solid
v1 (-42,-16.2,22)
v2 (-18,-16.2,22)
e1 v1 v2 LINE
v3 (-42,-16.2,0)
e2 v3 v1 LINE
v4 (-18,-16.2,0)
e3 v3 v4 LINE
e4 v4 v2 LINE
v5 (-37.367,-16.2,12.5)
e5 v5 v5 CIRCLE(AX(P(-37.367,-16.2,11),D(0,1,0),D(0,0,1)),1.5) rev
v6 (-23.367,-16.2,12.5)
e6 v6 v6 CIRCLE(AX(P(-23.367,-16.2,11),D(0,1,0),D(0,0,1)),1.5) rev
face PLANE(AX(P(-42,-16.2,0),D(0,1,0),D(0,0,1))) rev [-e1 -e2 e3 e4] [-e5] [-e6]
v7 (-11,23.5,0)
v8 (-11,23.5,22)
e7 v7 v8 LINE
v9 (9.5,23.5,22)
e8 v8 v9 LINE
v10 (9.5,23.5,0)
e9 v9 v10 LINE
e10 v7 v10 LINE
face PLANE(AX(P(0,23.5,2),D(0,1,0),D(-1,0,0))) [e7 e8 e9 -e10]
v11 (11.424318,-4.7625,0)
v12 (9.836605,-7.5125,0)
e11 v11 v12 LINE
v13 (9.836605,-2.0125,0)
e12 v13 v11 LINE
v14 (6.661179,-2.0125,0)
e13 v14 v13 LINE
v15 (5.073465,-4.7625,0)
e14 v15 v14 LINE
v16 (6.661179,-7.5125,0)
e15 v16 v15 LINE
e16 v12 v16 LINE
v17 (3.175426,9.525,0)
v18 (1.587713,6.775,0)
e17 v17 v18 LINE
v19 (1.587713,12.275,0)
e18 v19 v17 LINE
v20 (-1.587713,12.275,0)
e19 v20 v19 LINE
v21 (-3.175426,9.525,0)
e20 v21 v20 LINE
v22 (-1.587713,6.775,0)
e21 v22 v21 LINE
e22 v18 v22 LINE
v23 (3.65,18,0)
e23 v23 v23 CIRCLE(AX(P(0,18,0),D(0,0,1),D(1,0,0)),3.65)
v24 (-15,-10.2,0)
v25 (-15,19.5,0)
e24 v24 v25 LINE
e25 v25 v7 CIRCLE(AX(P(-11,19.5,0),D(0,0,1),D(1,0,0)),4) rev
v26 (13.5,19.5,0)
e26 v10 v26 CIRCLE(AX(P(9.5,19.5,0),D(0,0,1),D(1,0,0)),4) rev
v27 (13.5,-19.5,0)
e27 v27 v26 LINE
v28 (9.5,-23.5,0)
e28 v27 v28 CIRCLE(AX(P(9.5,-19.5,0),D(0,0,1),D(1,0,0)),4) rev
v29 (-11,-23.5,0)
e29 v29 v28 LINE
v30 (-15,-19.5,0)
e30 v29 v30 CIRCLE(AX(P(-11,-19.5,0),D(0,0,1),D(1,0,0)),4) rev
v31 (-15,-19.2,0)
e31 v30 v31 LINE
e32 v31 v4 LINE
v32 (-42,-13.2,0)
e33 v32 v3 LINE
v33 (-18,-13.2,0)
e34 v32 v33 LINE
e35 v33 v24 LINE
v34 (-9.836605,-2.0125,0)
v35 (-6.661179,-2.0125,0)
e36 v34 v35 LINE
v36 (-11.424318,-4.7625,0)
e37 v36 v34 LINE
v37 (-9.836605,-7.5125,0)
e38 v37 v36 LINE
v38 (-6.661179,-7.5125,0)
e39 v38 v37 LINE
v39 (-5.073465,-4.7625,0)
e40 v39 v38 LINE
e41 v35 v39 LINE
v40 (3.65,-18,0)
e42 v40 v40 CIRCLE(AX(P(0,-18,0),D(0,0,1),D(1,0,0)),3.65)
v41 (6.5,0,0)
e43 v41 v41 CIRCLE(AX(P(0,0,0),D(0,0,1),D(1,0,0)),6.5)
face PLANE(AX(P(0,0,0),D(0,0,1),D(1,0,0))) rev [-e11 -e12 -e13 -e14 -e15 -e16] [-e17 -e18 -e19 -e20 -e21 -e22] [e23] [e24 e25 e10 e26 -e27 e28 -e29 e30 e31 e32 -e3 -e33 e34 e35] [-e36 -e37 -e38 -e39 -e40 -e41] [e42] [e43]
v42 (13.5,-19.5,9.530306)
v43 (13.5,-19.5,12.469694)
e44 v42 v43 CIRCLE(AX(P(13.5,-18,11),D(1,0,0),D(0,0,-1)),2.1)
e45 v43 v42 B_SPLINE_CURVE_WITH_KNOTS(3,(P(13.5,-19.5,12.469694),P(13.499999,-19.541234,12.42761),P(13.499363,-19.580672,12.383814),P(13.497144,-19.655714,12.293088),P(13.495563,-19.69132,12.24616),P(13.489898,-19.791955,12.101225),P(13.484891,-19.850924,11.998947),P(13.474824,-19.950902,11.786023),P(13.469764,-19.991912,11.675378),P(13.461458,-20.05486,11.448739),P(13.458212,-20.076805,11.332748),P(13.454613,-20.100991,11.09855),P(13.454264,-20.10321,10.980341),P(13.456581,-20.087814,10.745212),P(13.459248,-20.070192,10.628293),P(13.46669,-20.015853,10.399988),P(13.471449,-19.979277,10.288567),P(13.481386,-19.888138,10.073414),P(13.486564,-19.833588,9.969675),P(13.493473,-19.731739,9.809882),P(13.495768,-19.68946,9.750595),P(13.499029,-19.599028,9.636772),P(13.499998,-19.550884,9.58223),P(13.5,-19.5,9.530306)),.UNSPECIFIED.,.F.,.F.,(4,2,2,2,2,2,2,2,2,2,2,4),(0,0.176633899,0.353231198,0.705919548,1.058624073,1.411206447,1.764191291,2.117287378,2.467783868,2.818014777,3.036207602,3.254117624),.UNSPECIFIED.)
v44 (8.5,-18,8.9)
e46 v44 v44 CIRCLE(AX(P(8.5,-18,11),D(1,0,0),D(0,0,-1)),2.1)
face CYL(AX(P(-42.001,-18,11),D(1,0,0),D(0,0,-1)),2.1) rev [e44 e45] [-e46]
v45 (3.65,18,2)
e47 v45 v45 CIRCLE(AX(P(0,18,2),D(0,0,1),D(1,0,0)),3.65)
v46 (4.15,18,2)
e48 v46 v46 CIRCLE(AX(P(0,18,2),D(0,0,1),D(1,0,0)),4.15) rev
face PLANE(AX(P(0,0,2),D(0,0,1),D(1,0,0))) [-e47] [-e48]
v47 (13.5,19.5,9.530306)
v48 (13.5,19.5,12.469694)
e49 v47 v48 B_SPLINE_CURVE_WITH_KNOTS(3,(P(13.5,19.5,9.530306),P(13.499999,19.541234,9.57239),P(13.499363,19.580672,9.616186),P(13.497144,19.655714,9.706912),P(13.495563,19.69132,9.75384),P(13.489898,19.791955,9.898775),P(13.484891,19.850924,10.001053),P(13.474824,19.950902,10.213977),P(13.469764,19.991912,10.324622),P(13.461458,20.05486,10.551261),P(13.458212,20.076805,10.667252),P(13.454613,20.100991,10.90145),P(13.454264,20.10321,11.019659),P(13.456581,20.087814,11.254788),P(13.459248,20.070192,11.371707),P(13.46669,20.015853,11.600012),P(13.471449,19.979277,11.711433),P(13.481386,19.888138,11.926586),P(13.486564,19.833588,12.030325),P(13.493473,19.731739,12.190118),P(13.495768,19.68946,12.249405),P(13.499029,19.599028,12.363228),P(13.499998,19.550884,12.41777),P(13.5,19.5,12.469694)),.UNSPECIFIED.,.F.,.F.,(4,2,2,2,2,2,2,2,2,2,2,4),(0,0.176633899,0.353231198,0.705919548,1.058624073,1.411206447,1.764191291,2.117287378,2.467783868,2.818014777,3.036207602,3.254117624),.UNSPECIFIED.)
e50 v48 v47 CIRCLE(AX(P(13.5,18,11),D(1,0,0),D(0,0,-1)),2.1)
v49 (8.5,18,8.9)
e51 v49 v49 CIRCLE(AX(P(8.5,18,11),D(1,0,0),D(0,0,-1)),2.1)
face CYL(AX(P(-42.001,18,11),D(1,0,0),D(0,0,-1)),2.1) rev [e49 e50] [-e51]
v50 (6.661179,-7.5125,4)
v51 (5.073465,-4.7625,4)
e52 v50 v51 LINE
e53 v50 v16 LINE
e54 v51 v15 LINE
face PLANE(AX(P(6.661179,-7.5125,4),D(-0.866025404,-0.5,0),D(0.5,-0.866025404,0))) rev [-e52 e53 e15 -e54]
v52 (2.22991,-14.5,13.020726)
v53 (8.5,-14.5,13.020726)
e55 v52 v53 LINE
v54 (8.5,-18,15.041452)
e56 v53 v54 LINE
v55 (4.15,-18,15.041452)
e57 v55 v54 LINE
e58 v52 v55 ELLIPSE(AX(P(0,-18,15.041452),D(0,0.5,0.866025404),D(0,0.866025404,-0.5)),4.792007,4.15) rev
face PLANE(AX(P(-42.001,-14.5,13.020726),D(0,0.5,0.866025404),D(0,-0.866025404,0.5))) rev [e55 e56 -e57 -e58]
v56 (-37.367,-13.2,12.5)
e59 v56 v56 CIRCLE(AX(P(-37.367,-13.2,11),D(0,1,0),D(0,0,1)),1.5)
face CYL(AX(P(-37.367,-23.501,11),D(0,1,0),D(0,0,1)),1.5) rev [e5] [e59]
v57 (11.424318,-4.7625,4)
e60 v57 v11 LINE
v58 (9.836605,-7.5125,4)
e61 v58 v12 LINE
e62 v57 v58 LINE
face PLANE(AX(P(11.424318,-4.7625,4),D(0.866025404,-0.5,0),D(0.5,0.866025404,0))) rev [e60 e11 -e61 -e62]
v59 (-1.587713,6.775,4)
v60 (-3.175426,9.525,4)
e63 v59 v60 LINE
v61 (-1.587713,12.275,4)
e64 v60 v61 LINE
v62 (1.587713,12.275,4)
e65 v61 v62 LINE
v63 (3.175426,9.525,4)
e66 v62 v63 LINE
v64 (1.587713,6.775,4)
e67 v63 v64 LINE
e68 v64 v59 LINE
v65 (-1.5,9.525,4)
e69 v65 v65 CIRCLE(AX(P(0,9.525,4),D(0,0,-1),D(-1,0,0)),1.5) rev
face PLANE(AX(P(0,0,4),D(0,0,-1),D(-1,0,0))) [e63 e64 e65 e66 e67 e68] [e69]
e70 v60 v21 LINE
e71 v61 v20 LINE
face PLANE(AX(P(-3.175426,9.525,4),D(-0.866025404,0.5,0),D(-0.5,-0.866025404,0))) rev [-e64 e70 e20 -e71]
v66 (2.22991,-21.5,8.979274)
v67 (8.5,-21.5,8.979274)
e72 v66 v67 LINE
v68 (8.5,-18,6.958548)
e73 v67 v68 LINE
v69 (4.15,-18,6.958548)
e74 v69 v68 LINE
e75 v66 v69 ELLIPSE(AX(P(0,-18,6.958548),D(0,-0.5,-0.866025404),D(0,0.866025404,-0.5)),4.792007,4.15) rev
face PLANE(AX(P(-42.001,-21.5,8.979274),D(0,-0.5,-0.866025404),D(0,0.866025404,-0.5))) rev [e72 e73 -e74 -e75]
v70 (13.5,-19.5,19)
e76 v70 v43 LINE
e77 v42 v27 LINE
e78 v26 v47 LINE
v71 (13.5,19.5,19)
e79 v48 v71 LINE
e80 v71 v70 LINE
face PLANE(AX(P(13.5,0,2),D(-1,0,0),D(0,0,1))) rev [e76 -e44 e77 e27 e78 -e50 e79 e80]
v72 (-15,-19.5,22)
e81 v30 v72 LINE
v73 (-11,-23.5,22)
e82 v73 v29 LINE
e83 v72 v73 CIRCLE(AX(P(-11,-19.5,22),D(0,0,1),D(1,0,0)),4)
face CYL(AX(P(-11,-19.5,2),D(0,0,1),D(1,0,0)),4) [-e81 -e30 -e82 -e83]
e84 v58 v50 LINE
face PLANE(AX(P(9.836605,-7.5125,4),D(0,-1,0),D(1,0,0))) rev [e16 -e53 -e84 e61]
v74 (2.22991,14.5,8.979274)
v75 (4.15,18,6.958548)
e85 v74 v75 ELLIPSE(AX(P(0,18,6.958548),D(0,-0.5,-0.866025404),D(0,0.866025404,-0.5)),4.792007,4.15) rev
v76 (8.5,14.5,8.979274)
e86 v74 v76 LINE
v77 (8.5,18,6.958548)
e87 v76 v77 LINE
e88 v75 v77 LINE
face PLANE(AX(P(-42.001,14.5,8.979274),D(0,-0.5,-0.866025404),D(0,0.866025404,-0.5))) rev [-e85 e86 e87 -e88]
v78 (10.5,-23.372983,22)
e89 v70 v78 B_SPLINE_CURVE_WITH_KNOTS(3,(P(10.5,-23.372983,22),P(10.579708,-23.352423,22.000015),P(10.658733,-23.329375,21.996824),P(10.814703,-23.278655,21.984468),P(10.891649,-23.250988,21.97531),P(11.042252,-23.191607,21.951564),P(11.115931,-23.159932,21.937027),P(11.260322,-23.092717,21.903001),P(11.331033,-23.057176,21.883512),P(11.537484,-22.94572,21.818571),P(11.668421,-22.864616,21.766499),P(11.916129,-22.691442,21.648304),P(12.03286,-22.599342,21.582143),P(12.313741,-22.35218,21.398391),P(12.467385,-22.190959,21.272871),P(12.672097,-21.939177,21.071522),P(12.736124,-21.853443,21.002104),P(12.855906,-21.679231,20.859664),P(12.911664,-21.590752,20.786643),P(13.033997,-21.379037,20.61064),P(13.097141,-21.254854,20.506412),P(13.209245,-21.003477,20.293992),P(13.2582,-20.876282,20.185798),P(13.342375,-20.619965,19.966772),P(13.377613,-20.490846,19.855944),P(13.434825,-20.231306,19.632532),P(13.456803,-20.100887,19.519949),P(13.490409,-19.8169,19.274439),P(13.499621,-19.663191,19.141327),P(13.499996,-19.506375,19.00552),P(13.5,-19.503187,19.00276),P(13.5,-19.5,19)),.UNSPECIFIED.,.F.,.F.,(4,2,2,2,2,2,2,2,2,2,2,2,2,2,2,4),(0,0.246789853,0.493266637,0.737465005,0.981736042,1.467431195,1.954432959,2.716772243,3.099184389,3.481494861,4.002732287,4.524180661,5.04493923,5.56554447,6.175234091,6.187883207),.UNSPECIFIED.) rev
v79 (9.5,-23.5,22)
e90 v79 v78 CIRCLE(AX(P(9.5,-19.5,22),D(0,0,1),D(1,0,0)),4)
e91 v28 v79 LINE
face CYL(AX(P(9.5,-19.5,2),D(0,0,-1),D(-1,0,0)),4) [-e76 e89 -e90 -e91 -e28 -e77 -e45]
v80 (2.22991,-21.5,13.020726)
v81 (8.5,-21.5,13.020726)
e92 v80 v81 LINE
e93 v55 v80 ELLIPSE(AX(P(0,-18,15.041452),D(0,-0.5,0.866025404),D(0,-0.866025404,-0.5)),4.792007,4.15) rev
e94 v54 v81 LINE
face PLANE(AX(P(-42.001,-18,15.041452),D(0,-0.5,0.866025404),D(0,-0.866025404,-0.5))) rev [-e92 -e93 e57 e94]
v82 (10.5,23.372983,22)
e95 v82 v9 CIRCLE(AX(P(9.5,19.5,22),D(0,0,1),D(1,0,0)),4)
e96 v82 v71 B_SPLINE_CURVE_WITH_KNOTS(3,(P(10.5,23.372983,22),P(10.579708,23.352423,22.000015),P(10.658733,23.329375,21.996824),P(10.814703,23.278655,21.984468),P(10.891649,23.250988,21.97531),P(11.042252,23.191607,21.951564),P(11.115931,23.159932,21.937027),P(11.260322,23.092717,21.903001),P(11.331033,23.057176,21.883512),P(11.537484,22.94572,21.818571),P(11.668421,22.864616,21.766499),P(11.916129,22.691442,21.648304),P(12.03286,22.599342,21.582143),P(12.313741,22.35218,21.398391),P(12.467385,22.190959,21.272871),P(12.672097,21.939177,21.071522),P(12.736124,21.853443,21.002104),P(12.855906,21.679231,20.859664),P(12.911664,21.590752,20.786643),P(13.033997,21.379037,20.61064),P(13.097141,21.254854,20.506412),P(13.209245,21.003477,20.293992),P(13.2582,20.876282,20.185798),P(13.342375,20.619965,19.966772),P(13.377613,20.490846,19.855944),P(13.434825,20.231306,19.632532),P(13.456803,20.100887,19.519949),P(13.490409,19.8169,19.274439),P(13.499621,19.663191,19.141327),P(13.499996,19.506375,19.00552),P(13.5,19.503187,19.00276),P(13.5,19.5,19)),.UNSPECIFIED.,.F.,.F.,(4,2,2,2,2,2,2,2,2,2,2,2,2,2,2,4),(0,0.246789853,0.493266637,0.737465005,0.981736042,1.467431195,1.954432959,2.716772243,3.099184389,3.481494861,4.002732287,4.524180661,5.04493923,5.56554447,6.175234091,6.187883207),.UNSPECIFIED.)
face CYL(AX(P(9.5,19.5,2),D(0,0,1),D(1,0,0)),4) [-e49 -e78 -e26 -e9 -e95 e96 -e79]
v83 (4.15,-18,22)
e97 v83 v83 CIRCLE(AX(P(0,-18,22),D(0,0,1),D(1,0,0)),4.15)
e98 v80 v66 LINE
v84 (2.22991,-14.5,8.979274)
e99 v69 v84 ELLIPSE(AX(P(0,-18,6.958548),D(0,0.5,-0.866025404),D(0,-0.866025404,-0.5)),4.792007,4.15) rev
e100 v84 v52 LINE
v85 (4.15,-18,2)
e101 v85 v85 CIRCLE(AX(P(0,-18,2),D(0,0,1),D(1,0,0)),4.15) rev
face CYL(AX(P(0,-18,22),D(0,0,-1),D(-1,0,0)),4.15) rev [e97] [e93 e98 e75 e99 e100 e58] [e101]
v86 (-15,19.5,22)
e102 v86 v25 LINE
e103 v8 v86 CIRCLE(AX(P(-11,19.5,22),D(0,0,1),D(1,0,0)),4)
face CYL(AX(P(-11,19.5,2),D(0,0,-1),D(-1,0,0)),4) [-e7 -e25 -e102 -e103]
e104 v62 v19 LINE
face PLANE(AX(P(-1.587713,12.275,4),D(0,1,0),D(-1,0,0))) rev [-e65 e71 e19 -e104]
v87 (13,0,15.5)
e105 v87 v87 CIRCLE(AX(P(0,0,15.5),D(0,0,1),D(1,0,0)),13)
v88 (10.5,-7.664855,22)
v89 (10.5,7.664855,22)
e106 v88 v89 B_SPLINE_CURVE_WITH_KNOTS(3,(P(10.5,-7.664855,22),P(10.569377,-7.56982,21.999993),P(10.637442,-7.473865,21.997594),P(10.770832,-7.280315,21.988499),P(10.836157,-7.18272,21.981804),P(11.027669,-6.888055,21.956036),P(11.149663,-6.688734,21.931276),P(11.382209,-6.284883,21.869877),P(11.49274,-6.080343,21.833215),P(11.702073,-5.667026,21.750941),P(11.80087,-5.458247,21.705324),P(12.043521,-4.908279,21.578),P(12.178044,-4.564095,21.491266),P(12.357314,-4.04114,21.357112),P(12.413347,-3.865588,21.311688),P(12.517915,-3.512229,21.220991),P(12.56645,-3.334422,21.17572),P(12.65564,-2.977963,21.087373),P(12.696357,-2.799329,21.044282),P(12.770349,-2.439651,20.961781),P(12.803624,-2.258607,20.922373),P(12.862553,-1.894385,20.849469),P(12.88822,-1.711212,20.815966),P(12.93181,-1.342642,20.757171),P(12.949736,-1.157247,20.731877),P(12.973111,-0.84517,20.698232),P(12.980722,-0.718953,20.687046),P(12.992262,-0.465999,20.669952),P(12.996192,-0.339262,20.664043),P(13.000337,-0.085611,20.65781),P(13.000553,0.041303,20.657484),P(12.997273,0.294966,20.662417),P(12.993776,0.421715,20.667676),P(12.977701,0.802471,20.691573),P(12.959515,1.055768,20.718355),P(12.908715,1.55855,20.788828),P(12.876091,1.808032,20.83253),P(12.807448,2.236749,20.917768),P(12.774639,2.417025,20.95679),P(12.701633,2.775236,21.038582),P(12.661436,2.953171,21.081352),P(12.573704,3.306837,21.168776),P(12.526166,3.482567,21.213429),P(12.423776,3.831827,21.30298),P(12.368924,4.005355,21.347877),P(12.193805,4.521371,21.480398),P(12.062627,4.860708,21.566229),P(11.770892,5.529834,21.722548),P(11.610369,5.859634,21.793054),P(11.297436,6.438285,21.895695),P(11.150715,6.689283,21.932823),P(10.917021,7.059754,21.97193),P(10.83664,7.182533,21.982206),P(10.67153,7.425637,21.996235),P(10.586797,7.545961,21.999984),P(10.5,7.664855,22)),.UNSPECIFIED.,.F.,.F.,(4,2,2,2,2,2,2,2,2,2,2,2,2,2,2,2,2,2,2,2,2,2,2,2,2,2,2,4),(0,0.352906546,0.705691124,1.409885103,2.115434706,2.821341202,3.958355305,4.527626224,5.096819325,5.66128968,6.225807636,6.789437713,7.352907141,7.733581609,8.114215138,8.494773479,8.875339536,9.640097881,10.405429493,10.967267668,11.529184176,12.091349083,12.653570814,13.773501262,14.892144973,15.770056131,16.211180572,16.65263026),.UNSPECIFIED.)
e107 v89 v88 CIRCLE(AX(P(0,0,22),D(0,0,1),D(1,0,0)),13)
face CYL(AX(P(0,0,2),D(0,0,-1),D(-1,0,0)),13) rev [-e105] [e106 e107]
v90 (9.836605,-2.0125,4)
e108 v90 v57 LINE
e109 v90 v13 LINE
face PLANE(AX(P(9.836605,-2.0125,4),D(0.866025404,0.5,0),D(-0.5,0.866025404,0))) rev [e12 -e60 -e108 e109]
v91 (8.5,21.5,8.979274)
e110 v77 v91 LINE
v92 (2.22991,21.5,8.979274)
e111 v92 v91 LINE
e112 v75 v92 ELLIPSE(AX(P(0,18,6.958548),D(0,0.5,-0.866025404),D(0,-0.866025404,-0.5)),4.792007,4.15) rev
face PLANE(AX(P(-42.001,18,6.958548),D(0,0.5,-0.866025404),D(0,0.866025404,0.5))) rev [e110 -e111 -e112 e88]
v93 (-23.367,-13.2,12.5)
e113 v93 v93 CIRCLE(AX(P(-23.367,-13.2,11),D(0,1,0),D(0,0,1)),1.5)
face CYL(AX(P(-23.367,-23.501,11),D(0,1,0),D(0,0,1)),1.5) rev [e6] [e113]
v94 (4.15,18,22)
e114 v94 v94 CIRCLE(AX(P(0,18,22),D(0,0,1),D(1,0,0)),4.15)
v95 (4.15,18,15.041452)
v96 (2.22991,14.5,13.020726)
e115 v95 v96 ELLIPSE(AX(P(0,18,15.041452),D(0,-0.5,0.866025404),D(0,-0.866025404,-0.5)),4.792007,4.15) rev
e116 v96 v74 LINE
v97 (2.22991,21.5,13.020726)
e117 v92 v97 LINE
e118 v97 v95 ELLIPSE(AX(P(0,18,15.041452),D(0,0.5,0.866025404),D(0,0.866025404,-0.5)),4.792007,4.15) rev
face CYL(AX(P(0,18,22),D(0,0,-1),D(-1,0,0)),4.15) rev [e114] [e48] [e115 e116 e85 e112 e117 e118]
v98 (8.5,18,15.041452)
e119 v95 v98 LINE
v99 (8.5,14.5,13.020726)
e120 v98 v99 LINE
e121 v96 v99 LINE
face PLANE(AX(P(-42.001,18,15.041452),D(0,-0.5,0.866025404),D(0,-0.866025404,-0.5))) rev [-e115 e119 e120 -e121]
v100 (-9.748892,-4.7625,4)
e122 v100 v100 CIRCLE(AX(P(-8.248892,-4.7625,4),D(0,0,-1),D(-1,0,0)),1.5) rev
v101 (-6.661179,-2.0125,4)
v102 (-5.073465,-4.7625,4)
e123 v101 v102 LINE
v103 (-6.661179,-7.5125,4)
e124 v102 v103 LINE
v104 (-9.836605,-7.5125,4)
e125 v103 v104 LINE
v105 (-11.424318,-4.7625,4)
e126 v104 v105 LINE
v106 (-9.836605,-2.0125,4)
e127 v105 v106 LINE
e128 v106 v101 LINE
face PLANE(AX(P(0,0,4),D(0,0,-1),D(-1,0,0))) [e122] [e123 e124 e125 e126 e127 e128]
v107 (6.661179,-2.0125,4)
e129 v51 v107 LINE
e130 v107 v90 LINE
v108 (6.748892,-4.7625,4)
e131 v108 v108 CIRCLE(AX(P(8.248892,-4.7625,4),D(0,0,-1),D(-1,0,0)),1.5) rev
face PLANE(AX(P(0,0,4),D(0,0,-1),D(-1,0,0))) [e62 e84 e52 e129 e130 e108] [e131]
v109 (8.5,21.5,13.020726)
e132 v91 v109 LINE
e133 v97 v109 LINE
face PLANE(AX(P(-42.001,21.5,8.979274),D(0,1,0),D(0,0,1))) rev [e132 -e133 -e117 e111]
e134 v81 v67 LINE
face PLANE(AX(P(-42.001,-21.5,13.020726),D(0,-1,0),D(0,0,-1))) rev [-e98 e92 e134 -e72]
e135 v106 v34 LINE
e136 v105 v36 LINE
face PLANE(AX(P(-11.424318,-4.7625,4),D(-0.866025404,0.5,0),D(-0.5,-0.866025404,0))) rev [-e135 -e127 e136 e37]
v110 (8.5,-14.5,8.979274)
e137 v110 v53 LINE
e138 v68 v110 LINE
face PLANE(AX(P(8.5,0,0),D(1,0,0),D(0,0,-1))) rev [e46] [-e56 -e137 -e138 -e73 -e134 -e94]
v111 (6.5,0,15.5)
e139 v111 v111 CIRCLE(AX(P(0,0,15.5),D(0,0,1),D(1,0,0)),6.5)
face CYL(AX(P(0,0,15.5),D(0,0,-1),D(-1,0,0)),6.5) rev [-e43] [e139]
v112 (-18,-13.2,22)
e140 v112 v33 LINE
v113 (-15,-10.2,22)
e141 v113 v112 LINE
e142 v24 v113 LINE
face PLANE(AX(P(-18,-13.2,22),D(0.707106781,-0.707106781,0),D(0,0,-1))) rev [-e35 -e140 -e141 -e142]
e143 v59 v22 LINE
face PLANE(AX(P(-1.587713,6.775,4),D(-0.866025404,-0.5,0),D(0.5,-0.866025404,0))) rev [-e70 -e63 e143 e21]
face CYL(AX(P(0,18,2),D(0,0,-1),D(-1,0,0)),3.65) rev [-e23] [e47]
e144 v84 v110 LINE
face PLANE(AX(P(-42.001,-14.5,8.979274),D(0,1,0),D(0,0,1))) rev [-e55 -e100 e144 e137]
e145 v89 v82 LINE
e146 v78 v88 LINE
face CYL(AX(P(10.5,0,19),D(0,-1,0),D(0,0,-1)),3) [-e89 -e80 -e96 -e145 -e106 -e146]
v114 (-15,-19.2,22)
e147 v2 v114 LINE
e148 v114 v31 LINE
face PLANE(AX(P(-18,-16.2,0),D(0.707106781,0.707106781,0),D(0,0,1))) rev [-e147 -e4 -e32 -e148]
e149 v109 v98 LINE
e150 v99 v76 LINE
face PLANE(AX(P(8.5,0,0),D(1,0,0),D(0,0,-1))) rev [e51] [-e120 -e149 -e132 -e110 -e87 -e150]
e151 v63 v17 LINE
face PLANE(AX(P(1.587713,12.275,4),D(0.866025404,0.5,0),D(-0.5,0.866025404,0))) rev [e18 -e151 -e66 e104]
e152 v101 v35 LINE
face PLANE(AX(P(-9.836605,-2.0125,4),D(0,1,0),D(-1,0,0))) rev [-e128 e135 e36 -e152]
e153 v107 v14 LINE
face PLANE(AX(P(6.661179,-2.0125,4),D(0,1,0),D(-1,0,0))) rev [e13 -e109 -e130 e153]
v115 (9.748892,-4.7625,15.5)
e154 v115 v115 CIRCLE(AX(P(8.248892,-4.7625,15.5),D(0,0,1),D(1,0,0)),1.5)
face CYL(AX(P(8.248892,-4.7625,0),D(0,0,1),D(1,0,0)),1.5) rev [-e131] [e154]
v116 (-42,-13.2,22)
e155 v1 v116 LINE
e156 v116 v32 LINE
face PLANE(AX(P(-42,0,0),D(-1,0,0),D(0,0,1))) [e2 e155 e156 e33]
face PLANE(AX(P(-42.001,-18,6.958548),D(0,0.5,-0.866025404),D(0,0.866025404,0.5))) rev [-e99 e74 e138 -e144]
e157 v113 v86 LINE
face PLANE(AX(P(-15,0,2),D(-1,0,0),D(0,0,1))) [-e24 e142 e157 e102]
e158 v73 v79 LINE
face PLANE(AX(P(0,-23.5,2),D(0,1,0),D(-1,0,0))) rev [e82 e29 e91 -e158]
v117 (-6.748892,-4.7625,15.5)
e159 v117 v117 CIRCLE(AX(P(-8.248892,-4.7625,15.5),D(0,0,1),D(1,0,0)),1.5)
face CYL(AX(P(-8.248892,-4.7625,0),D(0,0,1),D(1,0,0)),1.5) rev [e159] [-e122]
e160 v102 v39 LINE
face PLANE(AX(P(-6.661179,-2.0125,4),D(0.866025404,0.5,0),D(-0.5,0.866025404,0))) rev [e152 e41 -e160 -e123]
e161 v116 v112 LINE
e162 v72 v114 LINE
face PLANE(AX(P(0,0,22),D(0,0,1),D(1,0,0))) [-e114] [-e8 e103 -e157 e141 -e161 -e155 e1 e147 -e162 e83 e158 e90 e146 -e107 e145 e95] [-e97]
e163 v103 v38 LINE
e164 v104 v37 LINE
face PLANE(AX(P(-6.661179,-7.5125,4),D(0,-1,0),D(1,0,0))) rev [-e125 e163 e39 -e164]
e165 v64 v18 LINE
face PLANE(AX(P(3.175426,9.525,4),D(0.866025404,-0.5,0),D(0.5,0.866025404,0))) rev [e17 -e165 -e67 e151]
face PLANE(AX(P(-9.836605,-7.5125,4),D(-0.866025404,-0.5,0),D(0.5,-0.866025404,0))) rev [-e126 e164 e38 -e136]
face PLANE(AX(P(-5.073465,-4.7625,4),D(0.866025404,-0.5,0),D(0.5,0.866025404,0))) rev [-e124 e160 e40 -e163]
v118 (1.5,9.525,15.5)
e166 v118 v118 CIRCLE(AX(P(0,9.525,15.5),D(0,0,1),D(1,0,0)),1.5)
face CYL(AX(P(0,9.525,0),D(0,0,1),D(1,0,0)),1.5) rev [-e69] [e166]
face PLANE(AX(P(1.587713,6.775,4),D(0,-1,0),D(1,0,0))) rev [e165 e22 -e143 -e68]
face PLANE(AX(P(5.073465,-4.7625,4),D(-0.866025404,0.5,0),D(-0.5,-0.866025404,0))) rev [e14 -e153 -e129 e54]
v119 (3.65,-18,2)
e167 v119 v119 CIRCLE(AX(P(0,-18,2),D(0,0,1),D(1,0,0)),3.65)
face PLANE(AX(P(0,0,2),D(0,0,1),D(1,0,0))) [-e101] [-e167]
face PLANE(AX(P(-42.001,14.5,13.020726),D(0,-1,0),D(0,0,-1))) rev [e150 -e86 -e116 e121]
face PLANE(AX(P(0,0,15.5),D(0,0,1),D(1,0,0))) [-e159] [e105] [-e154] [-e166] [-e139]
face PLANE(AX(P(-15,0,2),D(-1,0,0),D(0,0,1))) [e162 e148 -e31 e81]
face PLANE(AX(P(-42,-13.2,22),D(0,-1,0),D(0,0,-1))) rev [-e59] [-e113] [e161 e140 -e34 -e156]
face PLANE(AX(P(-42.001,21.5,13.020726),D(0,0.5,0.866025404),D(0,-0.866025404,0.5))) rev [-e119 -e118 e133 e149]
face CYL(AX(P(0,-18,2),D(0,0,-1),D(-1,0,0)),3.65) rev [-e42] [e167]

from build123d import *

# Parameters (mm, degrees)
SKETCH1_W           = 28.5
SKETCH1_H           = 47
SKETCH1_R           = 3.65
SKETCH1_R_2         = 13
BOSS_EXTRUDE1_DEPTH = 2
SKETCH1_3_W         = 28.5
SKETCH1_3_H         = 47
SKETCH1_3_R         = 4.15
SKETCH1_3_R_2       = 13
BOSS_EXTRUDE2_DEPTH = 22
SKETCH2_W           = 22
SKETCH2_H           = 3
BOSS_EXTRUDE3_DEPTH = 27
SKETCH1_4_R         = 13
SKETCH1_4_R_2       = 6.5
BOSS_EXTRUDE4_DEPTH = 15.5
SKETCH3_R           = 1.5
CUT_EXTRUDE1_DEPTH  = 51.561843321
CUT_EXTRUDE3_REACH  = 66.16
SKETCH5_R           = 2.1
CUT_EXTRUDE4_REACH  = 71.16
CUT_EXTRUDE4_START  = -5
SKETCH5_3_R         = 2.1
CUT_EXTRUDE5_REACH  = 61.957
SKETCH6_R           = 1.5
CHAMFER1_SIZE       = 3
FILLET1_R           = 4
FILLET2_R           = 3
CUT_EXTRUDE6_DEPTH  = 4


with BuildPart() as part:
    # Sketch1 → Boss-Extrude1 (new body)
    with BuildSketch(Plane.XY):
        with Locations((-0.75, 0)):
            Rectangle(SKETCH1_W, SKETCH1_H)
        with Locations((0, 18)):
            Circle(SKETCH1_R, mode=Mode.SUBTRACT)
        with Locations((0, -18)):
            Circle(SKETCH1_R, mode=Mode.SUBTRACT)
        Circle(SKETCH1_R_2, mode=Mode.SUBTRACT)
    extrude(amount=BOSS_EXTRUDE1_DEPTH)

    # Sketch1<3> → Boss-Extrude2 (add)
    with BuildSketch(Plane.XY):
        with Locations((-0.75, 0)):
            Rectangle(SKETCH1_3_W, SKETCH1_3_H)
        with Locations((0, 18)):
            Circle(SKETCH1_3_R, mode=Mode.SUBTRACT)
        with Locations((0, -18)):
            Circle(SKETCH1_3_R, mode=Mode.SUBTRACT)
        Circle(SKETCH1_3_R_2, mode=Mode.SUBTRACT)
    extrude(amount=BOSS_EXTRUDE2_DEPTH)

    # Sketch2 → Boss-Extrude3 (add)
    with BuildSketch(Plane.ZY.offset(15)):
        with Locations((11, -14.7)):
            Rectangle(SKETCH2_W, SKETCH2_H)
    extrude(amount=BOSS_EXTRUDE3_DEPTH)

    # Sketch1<4> → Boss-Extrude4 (add)
    with BuildSketch(Plane.XY):
        Circle(SKETCH1_4_R)
        Circle(SKETCH1_4_R_2, mode=Mode.SUBTRACT)
    extrude(amount=BOSS_EXTRUDE4_DEPTH)

    # Sketch3 → Cut-Extrude1 (cut, through all)
    with BuildSketch(Plane.XY.offset(15.5)):
        with Locations((0, 9.525)):
            Circle(SKETCH3_R)
        with Locations((8.248891971, -4.7625)):
            Circle(SKETCH3_R)
        with Locations((-8.248891971, -4.7625)):
            Circle(SKETCH3_R)
    extrude(amount=-CUT_EXTRUDE1_DEPTH, mode=Mode.SUBTRACT)

    # Sketch5 → Cut-Extrude3 (cut, up to next)
    with BuildSketch(Plane(origin=(13.5, 0, 0), x_dir=(0, 0, -1), z_dir=(1, 0, 0)), mode=Mode.PRIVATE) as cut_extrude3_sk1:
        with Locations((-11, 18)):
            Circle(SKETCH5_R)
    cut_extrude3_tool1 = extrude(cut_extrude3_sk1.sketch, amount=-CUT_EXTRUDE3_REACH, mode=Mode.PRIVATE) & part.part
    # Sketch5 → Cut-Extrude3 (cut, up to next)
    with BuildSketch(Plane(origin=(13.5, 0, 0), x_dir=(0, 0, -1), z_dir=(1, 0, 0)), mode=Mode.PRIVATE) as cut_extrude3_sk2:
        with Locations((-11, -18)):
            Circle(SKETCH5_R)
    cut_extrude3_tool2 = extrude(cut_extrude3_sk2.sketch, amount=-CUT_EXTRUDE3_REACH, mode=Mode.PRIVATE) & part.part
    add(cut_extrude3_tool1.solids().sort_by_distance((13.5, 18, 11))[0], mode=Mode.SUBTRACT)
    add(cut_extrude3_tool2.solids().sort_by_distance((13.5, -18, 11))[0], mode=Mode.SUBTRACT)

    # Sketch5<3> → Cut-Extrude4 (cut, up to next)
    with BuildSketch(Plane(origin=(13.5, 0, 0), x_dir=(0, 0, -1), z_dir=(1, 0, 0)).offset(CUT_EXTRUDE4_START), mode=Mode.PRIVATE) as cut_extrude4_sk1:
        Polygon((-6.958548116, 18), (-8.979274058, 21.5), (-13.020725942, 21.5), (-15.041451884, 18), (-13.020725942, 14.5), (-8.979274058, 14.5), align=None)
        with Locations((-11, 18)):
            Circle(SKETCH5_3_R, mode=Mode.SUBTRACT)
    cut_extrude4_tool1 = extrude(cut_extrude4_sk1.sketch, amount=-CUT_EXTRUDE4_REACH, mode=Mode.PRIVATE) & part.part
    # Sketch5<3> → Cut-Extrude4 (cut, up to next)
    with BuildSketch(Plane(origin=(13.5, 0, 0), x_dir=(0, 0, -1), z_dir=(1, 0, 0)).offset(CUT_EXTRUDE4_START), mode=Mode.PRIVATE) as cut_extrude4_sk2:
        Polygon((-6.958548116, -18), (-8.979274058, -14.5), (-13.020725942, -14.5), (-15.041451884, -18), (-13.020725942, -21.5), (-8.979274058, -21.5), align=None)
        with Locations((-11, -18)):
            Circle(SKETCH5_3_R, mode=Mode.SUBTRACT)
    cut_extrude4_tool2 = extrude(cut_extrude4_sk2.sketch, amount=-CUT_EXTRUDE4_REACH, mode=Mode.PRIVATE) & part.part
    add(cut_extrude4_tool1.solids().sort_by_distance((8.5, 19.696537, 8.061512))[0], mode=Mode.SUBTRACT)
    add(cut_extrude4_tool2.solids().sort_by_distance((8.5, -16.303463, 8.061512))[0], mode=Mode.SUBTRACT)

    # Sketch6 → Cut-Extrude5 (cut, up to next)
    with BuildSketch(Plane(origin=(0, -13.2, 0), x_dir=(1, 0, 0), z_dir=(0, 1, 0)), mode=Mode.PRIVATE) as cut_extrude5_sk1:
        with Locations(Location((-37.367, -11, 0), (0, 0, 270))):
            Circle(SKETCH6_R)
    cut_extrude5_tool1 = extrude(cut_extrude5_sk1.sketch, amount=-CUT_EXTRUDE5_REACH, mode=Mode.PRIVATE) & part.part
    # Sketch6 → Cut-Extrude5 (cut, up to next)
    with BuildSketch(Plane(origin=(0, -13.2, 0), x_dir=(1, 0, 0), z_dir=(0, 1, 0)), mode=Mode.PRIVATE) as cut_extrude5_sk2:
        with Locations(Location((-23.367, -11, 0), (0, 0, 270))):
            Circle(SKETCH6_R)
    cut_extrude5_tool2 = extrude(cut_extrude5_sk2.sketch, amount=-CUT_EXTRUDE5_REACH, mode=Mode.PRIVATE) & part.part
    add(cut_extrude5_tool1.solids().sort_by_distance((-37.367, -13.2, 11))[0], mode=Mode.SUBTRACT)
    add(cut_extrude5_tool2.solids().sort_by_distance((-23.367, -13.2, 11))[0], mode=Mode.SUBTRACT)

    # Chamfer1
    chamfer1_edges = [part.edges().sort_by_distance(p)[0] for p in [
        (-15, -16.2, 11),
        (-15, -13.2, 11),
    ]]
    chamfer(chamfer1_edges, length=CHAMFER1_SIZE)

    # Fillet1
    # the kernel refuses this fillet: 4 mm, written as the material it takes off along each edge
    with BuildSketch(Plane(origin=(-15, -23.5, 32), x_dir=(0, 1, 0), z_dir=(0, 0, -1)), Plane(origin=(-15, 23.5, 32), x_dir=(1, 0, 0), z_dir=(0, 0, -1))) as fillet1_piece_1:
        with BuildLine():
            CenterArc((FILLET1_R, FILLET1_R), FILLET1_R, 180, 90)
            Line((0, FILLET1_R), (0, 0))
            Line((0, 0), (FILLET1_R, 0))
        make_face()
    extrude(amount=42, mode=Mode.SUBTRACT)
    with BuildSketch(Plane(origin=(13.5, 23.5, -10), x_dir=(0, -1, 0), z_dir=(0, 0, 1)), Plane(origin=(13.5, -23.5, -10), x_dir=(-1, 0, 0), z_dir=(0, 0, 1))) as fillet1_piece_2:
        with BuildLine():
            CenterArc((FILLET1_R, -FILLET1_R), FILLET1_R, 90, 90)
            Line((0, -FILLET1_R), (0, 0))
            Line((0, 0), (FILLET1_R, 0))
        make_face()
    extrude(amount=42, mode=Mode.SUBTRACT)

    # Fillet2
    # the kernel refuses this fillet: 3 mm, written as the material it takes off along each edge
    with BuildSketch(Plane(origin=(13.5, -27, 22), x_dir=(-1, 0, 0), z_dir=(0, 1, 0))) as fillet2_piece_1:
        with BuildLine():
            CenterArc((FILLET2_R, -FILLET2_R), FILLET2_R, 90, 90)
            Line((0, -FILLET2_R), (0, 0))
            Line((0, 0), (FILLET2_R, 0))
        make_face()
    extrude(amount=54, mode=Mode.SUBTRACT)

    # Sketch7 → Cut-Extrude6 (cut)
    with BuildSketch(Plane(origin=(0, 0, 0), x_dir=(-1, 0, 0), z_dir=(0, 0, -1))):
        Polygon((1.58771324, 6.775), (3.175426481, 9.525), (1.58771324, 12.275), (-1.58771324, 12.275), (-3.175426481, 9.525), (-1.58771324, 6.775), align=None)
        Polygon((11.424318452, -4.7625), (9.836605211, -2.0125), (6.661178731, -2.0125), (5.073465491, -4.7625), (6.661178731, -7.5125), (9.836605211, -7.5125), align=None)
        Polygon((-9.836605211, -7.5125), (-6.661178731, -7.5125), (-5.073465491, -4.7625), (-6.661178731, -2.0125), (-9.836605211, -2.0125), (-11.424318452, -4.7625), align=None)
    extrude(amount=-CUT_EXTRUDE6_DEPTH, mode=Mode.SUBTRACT)


solid = part.part
